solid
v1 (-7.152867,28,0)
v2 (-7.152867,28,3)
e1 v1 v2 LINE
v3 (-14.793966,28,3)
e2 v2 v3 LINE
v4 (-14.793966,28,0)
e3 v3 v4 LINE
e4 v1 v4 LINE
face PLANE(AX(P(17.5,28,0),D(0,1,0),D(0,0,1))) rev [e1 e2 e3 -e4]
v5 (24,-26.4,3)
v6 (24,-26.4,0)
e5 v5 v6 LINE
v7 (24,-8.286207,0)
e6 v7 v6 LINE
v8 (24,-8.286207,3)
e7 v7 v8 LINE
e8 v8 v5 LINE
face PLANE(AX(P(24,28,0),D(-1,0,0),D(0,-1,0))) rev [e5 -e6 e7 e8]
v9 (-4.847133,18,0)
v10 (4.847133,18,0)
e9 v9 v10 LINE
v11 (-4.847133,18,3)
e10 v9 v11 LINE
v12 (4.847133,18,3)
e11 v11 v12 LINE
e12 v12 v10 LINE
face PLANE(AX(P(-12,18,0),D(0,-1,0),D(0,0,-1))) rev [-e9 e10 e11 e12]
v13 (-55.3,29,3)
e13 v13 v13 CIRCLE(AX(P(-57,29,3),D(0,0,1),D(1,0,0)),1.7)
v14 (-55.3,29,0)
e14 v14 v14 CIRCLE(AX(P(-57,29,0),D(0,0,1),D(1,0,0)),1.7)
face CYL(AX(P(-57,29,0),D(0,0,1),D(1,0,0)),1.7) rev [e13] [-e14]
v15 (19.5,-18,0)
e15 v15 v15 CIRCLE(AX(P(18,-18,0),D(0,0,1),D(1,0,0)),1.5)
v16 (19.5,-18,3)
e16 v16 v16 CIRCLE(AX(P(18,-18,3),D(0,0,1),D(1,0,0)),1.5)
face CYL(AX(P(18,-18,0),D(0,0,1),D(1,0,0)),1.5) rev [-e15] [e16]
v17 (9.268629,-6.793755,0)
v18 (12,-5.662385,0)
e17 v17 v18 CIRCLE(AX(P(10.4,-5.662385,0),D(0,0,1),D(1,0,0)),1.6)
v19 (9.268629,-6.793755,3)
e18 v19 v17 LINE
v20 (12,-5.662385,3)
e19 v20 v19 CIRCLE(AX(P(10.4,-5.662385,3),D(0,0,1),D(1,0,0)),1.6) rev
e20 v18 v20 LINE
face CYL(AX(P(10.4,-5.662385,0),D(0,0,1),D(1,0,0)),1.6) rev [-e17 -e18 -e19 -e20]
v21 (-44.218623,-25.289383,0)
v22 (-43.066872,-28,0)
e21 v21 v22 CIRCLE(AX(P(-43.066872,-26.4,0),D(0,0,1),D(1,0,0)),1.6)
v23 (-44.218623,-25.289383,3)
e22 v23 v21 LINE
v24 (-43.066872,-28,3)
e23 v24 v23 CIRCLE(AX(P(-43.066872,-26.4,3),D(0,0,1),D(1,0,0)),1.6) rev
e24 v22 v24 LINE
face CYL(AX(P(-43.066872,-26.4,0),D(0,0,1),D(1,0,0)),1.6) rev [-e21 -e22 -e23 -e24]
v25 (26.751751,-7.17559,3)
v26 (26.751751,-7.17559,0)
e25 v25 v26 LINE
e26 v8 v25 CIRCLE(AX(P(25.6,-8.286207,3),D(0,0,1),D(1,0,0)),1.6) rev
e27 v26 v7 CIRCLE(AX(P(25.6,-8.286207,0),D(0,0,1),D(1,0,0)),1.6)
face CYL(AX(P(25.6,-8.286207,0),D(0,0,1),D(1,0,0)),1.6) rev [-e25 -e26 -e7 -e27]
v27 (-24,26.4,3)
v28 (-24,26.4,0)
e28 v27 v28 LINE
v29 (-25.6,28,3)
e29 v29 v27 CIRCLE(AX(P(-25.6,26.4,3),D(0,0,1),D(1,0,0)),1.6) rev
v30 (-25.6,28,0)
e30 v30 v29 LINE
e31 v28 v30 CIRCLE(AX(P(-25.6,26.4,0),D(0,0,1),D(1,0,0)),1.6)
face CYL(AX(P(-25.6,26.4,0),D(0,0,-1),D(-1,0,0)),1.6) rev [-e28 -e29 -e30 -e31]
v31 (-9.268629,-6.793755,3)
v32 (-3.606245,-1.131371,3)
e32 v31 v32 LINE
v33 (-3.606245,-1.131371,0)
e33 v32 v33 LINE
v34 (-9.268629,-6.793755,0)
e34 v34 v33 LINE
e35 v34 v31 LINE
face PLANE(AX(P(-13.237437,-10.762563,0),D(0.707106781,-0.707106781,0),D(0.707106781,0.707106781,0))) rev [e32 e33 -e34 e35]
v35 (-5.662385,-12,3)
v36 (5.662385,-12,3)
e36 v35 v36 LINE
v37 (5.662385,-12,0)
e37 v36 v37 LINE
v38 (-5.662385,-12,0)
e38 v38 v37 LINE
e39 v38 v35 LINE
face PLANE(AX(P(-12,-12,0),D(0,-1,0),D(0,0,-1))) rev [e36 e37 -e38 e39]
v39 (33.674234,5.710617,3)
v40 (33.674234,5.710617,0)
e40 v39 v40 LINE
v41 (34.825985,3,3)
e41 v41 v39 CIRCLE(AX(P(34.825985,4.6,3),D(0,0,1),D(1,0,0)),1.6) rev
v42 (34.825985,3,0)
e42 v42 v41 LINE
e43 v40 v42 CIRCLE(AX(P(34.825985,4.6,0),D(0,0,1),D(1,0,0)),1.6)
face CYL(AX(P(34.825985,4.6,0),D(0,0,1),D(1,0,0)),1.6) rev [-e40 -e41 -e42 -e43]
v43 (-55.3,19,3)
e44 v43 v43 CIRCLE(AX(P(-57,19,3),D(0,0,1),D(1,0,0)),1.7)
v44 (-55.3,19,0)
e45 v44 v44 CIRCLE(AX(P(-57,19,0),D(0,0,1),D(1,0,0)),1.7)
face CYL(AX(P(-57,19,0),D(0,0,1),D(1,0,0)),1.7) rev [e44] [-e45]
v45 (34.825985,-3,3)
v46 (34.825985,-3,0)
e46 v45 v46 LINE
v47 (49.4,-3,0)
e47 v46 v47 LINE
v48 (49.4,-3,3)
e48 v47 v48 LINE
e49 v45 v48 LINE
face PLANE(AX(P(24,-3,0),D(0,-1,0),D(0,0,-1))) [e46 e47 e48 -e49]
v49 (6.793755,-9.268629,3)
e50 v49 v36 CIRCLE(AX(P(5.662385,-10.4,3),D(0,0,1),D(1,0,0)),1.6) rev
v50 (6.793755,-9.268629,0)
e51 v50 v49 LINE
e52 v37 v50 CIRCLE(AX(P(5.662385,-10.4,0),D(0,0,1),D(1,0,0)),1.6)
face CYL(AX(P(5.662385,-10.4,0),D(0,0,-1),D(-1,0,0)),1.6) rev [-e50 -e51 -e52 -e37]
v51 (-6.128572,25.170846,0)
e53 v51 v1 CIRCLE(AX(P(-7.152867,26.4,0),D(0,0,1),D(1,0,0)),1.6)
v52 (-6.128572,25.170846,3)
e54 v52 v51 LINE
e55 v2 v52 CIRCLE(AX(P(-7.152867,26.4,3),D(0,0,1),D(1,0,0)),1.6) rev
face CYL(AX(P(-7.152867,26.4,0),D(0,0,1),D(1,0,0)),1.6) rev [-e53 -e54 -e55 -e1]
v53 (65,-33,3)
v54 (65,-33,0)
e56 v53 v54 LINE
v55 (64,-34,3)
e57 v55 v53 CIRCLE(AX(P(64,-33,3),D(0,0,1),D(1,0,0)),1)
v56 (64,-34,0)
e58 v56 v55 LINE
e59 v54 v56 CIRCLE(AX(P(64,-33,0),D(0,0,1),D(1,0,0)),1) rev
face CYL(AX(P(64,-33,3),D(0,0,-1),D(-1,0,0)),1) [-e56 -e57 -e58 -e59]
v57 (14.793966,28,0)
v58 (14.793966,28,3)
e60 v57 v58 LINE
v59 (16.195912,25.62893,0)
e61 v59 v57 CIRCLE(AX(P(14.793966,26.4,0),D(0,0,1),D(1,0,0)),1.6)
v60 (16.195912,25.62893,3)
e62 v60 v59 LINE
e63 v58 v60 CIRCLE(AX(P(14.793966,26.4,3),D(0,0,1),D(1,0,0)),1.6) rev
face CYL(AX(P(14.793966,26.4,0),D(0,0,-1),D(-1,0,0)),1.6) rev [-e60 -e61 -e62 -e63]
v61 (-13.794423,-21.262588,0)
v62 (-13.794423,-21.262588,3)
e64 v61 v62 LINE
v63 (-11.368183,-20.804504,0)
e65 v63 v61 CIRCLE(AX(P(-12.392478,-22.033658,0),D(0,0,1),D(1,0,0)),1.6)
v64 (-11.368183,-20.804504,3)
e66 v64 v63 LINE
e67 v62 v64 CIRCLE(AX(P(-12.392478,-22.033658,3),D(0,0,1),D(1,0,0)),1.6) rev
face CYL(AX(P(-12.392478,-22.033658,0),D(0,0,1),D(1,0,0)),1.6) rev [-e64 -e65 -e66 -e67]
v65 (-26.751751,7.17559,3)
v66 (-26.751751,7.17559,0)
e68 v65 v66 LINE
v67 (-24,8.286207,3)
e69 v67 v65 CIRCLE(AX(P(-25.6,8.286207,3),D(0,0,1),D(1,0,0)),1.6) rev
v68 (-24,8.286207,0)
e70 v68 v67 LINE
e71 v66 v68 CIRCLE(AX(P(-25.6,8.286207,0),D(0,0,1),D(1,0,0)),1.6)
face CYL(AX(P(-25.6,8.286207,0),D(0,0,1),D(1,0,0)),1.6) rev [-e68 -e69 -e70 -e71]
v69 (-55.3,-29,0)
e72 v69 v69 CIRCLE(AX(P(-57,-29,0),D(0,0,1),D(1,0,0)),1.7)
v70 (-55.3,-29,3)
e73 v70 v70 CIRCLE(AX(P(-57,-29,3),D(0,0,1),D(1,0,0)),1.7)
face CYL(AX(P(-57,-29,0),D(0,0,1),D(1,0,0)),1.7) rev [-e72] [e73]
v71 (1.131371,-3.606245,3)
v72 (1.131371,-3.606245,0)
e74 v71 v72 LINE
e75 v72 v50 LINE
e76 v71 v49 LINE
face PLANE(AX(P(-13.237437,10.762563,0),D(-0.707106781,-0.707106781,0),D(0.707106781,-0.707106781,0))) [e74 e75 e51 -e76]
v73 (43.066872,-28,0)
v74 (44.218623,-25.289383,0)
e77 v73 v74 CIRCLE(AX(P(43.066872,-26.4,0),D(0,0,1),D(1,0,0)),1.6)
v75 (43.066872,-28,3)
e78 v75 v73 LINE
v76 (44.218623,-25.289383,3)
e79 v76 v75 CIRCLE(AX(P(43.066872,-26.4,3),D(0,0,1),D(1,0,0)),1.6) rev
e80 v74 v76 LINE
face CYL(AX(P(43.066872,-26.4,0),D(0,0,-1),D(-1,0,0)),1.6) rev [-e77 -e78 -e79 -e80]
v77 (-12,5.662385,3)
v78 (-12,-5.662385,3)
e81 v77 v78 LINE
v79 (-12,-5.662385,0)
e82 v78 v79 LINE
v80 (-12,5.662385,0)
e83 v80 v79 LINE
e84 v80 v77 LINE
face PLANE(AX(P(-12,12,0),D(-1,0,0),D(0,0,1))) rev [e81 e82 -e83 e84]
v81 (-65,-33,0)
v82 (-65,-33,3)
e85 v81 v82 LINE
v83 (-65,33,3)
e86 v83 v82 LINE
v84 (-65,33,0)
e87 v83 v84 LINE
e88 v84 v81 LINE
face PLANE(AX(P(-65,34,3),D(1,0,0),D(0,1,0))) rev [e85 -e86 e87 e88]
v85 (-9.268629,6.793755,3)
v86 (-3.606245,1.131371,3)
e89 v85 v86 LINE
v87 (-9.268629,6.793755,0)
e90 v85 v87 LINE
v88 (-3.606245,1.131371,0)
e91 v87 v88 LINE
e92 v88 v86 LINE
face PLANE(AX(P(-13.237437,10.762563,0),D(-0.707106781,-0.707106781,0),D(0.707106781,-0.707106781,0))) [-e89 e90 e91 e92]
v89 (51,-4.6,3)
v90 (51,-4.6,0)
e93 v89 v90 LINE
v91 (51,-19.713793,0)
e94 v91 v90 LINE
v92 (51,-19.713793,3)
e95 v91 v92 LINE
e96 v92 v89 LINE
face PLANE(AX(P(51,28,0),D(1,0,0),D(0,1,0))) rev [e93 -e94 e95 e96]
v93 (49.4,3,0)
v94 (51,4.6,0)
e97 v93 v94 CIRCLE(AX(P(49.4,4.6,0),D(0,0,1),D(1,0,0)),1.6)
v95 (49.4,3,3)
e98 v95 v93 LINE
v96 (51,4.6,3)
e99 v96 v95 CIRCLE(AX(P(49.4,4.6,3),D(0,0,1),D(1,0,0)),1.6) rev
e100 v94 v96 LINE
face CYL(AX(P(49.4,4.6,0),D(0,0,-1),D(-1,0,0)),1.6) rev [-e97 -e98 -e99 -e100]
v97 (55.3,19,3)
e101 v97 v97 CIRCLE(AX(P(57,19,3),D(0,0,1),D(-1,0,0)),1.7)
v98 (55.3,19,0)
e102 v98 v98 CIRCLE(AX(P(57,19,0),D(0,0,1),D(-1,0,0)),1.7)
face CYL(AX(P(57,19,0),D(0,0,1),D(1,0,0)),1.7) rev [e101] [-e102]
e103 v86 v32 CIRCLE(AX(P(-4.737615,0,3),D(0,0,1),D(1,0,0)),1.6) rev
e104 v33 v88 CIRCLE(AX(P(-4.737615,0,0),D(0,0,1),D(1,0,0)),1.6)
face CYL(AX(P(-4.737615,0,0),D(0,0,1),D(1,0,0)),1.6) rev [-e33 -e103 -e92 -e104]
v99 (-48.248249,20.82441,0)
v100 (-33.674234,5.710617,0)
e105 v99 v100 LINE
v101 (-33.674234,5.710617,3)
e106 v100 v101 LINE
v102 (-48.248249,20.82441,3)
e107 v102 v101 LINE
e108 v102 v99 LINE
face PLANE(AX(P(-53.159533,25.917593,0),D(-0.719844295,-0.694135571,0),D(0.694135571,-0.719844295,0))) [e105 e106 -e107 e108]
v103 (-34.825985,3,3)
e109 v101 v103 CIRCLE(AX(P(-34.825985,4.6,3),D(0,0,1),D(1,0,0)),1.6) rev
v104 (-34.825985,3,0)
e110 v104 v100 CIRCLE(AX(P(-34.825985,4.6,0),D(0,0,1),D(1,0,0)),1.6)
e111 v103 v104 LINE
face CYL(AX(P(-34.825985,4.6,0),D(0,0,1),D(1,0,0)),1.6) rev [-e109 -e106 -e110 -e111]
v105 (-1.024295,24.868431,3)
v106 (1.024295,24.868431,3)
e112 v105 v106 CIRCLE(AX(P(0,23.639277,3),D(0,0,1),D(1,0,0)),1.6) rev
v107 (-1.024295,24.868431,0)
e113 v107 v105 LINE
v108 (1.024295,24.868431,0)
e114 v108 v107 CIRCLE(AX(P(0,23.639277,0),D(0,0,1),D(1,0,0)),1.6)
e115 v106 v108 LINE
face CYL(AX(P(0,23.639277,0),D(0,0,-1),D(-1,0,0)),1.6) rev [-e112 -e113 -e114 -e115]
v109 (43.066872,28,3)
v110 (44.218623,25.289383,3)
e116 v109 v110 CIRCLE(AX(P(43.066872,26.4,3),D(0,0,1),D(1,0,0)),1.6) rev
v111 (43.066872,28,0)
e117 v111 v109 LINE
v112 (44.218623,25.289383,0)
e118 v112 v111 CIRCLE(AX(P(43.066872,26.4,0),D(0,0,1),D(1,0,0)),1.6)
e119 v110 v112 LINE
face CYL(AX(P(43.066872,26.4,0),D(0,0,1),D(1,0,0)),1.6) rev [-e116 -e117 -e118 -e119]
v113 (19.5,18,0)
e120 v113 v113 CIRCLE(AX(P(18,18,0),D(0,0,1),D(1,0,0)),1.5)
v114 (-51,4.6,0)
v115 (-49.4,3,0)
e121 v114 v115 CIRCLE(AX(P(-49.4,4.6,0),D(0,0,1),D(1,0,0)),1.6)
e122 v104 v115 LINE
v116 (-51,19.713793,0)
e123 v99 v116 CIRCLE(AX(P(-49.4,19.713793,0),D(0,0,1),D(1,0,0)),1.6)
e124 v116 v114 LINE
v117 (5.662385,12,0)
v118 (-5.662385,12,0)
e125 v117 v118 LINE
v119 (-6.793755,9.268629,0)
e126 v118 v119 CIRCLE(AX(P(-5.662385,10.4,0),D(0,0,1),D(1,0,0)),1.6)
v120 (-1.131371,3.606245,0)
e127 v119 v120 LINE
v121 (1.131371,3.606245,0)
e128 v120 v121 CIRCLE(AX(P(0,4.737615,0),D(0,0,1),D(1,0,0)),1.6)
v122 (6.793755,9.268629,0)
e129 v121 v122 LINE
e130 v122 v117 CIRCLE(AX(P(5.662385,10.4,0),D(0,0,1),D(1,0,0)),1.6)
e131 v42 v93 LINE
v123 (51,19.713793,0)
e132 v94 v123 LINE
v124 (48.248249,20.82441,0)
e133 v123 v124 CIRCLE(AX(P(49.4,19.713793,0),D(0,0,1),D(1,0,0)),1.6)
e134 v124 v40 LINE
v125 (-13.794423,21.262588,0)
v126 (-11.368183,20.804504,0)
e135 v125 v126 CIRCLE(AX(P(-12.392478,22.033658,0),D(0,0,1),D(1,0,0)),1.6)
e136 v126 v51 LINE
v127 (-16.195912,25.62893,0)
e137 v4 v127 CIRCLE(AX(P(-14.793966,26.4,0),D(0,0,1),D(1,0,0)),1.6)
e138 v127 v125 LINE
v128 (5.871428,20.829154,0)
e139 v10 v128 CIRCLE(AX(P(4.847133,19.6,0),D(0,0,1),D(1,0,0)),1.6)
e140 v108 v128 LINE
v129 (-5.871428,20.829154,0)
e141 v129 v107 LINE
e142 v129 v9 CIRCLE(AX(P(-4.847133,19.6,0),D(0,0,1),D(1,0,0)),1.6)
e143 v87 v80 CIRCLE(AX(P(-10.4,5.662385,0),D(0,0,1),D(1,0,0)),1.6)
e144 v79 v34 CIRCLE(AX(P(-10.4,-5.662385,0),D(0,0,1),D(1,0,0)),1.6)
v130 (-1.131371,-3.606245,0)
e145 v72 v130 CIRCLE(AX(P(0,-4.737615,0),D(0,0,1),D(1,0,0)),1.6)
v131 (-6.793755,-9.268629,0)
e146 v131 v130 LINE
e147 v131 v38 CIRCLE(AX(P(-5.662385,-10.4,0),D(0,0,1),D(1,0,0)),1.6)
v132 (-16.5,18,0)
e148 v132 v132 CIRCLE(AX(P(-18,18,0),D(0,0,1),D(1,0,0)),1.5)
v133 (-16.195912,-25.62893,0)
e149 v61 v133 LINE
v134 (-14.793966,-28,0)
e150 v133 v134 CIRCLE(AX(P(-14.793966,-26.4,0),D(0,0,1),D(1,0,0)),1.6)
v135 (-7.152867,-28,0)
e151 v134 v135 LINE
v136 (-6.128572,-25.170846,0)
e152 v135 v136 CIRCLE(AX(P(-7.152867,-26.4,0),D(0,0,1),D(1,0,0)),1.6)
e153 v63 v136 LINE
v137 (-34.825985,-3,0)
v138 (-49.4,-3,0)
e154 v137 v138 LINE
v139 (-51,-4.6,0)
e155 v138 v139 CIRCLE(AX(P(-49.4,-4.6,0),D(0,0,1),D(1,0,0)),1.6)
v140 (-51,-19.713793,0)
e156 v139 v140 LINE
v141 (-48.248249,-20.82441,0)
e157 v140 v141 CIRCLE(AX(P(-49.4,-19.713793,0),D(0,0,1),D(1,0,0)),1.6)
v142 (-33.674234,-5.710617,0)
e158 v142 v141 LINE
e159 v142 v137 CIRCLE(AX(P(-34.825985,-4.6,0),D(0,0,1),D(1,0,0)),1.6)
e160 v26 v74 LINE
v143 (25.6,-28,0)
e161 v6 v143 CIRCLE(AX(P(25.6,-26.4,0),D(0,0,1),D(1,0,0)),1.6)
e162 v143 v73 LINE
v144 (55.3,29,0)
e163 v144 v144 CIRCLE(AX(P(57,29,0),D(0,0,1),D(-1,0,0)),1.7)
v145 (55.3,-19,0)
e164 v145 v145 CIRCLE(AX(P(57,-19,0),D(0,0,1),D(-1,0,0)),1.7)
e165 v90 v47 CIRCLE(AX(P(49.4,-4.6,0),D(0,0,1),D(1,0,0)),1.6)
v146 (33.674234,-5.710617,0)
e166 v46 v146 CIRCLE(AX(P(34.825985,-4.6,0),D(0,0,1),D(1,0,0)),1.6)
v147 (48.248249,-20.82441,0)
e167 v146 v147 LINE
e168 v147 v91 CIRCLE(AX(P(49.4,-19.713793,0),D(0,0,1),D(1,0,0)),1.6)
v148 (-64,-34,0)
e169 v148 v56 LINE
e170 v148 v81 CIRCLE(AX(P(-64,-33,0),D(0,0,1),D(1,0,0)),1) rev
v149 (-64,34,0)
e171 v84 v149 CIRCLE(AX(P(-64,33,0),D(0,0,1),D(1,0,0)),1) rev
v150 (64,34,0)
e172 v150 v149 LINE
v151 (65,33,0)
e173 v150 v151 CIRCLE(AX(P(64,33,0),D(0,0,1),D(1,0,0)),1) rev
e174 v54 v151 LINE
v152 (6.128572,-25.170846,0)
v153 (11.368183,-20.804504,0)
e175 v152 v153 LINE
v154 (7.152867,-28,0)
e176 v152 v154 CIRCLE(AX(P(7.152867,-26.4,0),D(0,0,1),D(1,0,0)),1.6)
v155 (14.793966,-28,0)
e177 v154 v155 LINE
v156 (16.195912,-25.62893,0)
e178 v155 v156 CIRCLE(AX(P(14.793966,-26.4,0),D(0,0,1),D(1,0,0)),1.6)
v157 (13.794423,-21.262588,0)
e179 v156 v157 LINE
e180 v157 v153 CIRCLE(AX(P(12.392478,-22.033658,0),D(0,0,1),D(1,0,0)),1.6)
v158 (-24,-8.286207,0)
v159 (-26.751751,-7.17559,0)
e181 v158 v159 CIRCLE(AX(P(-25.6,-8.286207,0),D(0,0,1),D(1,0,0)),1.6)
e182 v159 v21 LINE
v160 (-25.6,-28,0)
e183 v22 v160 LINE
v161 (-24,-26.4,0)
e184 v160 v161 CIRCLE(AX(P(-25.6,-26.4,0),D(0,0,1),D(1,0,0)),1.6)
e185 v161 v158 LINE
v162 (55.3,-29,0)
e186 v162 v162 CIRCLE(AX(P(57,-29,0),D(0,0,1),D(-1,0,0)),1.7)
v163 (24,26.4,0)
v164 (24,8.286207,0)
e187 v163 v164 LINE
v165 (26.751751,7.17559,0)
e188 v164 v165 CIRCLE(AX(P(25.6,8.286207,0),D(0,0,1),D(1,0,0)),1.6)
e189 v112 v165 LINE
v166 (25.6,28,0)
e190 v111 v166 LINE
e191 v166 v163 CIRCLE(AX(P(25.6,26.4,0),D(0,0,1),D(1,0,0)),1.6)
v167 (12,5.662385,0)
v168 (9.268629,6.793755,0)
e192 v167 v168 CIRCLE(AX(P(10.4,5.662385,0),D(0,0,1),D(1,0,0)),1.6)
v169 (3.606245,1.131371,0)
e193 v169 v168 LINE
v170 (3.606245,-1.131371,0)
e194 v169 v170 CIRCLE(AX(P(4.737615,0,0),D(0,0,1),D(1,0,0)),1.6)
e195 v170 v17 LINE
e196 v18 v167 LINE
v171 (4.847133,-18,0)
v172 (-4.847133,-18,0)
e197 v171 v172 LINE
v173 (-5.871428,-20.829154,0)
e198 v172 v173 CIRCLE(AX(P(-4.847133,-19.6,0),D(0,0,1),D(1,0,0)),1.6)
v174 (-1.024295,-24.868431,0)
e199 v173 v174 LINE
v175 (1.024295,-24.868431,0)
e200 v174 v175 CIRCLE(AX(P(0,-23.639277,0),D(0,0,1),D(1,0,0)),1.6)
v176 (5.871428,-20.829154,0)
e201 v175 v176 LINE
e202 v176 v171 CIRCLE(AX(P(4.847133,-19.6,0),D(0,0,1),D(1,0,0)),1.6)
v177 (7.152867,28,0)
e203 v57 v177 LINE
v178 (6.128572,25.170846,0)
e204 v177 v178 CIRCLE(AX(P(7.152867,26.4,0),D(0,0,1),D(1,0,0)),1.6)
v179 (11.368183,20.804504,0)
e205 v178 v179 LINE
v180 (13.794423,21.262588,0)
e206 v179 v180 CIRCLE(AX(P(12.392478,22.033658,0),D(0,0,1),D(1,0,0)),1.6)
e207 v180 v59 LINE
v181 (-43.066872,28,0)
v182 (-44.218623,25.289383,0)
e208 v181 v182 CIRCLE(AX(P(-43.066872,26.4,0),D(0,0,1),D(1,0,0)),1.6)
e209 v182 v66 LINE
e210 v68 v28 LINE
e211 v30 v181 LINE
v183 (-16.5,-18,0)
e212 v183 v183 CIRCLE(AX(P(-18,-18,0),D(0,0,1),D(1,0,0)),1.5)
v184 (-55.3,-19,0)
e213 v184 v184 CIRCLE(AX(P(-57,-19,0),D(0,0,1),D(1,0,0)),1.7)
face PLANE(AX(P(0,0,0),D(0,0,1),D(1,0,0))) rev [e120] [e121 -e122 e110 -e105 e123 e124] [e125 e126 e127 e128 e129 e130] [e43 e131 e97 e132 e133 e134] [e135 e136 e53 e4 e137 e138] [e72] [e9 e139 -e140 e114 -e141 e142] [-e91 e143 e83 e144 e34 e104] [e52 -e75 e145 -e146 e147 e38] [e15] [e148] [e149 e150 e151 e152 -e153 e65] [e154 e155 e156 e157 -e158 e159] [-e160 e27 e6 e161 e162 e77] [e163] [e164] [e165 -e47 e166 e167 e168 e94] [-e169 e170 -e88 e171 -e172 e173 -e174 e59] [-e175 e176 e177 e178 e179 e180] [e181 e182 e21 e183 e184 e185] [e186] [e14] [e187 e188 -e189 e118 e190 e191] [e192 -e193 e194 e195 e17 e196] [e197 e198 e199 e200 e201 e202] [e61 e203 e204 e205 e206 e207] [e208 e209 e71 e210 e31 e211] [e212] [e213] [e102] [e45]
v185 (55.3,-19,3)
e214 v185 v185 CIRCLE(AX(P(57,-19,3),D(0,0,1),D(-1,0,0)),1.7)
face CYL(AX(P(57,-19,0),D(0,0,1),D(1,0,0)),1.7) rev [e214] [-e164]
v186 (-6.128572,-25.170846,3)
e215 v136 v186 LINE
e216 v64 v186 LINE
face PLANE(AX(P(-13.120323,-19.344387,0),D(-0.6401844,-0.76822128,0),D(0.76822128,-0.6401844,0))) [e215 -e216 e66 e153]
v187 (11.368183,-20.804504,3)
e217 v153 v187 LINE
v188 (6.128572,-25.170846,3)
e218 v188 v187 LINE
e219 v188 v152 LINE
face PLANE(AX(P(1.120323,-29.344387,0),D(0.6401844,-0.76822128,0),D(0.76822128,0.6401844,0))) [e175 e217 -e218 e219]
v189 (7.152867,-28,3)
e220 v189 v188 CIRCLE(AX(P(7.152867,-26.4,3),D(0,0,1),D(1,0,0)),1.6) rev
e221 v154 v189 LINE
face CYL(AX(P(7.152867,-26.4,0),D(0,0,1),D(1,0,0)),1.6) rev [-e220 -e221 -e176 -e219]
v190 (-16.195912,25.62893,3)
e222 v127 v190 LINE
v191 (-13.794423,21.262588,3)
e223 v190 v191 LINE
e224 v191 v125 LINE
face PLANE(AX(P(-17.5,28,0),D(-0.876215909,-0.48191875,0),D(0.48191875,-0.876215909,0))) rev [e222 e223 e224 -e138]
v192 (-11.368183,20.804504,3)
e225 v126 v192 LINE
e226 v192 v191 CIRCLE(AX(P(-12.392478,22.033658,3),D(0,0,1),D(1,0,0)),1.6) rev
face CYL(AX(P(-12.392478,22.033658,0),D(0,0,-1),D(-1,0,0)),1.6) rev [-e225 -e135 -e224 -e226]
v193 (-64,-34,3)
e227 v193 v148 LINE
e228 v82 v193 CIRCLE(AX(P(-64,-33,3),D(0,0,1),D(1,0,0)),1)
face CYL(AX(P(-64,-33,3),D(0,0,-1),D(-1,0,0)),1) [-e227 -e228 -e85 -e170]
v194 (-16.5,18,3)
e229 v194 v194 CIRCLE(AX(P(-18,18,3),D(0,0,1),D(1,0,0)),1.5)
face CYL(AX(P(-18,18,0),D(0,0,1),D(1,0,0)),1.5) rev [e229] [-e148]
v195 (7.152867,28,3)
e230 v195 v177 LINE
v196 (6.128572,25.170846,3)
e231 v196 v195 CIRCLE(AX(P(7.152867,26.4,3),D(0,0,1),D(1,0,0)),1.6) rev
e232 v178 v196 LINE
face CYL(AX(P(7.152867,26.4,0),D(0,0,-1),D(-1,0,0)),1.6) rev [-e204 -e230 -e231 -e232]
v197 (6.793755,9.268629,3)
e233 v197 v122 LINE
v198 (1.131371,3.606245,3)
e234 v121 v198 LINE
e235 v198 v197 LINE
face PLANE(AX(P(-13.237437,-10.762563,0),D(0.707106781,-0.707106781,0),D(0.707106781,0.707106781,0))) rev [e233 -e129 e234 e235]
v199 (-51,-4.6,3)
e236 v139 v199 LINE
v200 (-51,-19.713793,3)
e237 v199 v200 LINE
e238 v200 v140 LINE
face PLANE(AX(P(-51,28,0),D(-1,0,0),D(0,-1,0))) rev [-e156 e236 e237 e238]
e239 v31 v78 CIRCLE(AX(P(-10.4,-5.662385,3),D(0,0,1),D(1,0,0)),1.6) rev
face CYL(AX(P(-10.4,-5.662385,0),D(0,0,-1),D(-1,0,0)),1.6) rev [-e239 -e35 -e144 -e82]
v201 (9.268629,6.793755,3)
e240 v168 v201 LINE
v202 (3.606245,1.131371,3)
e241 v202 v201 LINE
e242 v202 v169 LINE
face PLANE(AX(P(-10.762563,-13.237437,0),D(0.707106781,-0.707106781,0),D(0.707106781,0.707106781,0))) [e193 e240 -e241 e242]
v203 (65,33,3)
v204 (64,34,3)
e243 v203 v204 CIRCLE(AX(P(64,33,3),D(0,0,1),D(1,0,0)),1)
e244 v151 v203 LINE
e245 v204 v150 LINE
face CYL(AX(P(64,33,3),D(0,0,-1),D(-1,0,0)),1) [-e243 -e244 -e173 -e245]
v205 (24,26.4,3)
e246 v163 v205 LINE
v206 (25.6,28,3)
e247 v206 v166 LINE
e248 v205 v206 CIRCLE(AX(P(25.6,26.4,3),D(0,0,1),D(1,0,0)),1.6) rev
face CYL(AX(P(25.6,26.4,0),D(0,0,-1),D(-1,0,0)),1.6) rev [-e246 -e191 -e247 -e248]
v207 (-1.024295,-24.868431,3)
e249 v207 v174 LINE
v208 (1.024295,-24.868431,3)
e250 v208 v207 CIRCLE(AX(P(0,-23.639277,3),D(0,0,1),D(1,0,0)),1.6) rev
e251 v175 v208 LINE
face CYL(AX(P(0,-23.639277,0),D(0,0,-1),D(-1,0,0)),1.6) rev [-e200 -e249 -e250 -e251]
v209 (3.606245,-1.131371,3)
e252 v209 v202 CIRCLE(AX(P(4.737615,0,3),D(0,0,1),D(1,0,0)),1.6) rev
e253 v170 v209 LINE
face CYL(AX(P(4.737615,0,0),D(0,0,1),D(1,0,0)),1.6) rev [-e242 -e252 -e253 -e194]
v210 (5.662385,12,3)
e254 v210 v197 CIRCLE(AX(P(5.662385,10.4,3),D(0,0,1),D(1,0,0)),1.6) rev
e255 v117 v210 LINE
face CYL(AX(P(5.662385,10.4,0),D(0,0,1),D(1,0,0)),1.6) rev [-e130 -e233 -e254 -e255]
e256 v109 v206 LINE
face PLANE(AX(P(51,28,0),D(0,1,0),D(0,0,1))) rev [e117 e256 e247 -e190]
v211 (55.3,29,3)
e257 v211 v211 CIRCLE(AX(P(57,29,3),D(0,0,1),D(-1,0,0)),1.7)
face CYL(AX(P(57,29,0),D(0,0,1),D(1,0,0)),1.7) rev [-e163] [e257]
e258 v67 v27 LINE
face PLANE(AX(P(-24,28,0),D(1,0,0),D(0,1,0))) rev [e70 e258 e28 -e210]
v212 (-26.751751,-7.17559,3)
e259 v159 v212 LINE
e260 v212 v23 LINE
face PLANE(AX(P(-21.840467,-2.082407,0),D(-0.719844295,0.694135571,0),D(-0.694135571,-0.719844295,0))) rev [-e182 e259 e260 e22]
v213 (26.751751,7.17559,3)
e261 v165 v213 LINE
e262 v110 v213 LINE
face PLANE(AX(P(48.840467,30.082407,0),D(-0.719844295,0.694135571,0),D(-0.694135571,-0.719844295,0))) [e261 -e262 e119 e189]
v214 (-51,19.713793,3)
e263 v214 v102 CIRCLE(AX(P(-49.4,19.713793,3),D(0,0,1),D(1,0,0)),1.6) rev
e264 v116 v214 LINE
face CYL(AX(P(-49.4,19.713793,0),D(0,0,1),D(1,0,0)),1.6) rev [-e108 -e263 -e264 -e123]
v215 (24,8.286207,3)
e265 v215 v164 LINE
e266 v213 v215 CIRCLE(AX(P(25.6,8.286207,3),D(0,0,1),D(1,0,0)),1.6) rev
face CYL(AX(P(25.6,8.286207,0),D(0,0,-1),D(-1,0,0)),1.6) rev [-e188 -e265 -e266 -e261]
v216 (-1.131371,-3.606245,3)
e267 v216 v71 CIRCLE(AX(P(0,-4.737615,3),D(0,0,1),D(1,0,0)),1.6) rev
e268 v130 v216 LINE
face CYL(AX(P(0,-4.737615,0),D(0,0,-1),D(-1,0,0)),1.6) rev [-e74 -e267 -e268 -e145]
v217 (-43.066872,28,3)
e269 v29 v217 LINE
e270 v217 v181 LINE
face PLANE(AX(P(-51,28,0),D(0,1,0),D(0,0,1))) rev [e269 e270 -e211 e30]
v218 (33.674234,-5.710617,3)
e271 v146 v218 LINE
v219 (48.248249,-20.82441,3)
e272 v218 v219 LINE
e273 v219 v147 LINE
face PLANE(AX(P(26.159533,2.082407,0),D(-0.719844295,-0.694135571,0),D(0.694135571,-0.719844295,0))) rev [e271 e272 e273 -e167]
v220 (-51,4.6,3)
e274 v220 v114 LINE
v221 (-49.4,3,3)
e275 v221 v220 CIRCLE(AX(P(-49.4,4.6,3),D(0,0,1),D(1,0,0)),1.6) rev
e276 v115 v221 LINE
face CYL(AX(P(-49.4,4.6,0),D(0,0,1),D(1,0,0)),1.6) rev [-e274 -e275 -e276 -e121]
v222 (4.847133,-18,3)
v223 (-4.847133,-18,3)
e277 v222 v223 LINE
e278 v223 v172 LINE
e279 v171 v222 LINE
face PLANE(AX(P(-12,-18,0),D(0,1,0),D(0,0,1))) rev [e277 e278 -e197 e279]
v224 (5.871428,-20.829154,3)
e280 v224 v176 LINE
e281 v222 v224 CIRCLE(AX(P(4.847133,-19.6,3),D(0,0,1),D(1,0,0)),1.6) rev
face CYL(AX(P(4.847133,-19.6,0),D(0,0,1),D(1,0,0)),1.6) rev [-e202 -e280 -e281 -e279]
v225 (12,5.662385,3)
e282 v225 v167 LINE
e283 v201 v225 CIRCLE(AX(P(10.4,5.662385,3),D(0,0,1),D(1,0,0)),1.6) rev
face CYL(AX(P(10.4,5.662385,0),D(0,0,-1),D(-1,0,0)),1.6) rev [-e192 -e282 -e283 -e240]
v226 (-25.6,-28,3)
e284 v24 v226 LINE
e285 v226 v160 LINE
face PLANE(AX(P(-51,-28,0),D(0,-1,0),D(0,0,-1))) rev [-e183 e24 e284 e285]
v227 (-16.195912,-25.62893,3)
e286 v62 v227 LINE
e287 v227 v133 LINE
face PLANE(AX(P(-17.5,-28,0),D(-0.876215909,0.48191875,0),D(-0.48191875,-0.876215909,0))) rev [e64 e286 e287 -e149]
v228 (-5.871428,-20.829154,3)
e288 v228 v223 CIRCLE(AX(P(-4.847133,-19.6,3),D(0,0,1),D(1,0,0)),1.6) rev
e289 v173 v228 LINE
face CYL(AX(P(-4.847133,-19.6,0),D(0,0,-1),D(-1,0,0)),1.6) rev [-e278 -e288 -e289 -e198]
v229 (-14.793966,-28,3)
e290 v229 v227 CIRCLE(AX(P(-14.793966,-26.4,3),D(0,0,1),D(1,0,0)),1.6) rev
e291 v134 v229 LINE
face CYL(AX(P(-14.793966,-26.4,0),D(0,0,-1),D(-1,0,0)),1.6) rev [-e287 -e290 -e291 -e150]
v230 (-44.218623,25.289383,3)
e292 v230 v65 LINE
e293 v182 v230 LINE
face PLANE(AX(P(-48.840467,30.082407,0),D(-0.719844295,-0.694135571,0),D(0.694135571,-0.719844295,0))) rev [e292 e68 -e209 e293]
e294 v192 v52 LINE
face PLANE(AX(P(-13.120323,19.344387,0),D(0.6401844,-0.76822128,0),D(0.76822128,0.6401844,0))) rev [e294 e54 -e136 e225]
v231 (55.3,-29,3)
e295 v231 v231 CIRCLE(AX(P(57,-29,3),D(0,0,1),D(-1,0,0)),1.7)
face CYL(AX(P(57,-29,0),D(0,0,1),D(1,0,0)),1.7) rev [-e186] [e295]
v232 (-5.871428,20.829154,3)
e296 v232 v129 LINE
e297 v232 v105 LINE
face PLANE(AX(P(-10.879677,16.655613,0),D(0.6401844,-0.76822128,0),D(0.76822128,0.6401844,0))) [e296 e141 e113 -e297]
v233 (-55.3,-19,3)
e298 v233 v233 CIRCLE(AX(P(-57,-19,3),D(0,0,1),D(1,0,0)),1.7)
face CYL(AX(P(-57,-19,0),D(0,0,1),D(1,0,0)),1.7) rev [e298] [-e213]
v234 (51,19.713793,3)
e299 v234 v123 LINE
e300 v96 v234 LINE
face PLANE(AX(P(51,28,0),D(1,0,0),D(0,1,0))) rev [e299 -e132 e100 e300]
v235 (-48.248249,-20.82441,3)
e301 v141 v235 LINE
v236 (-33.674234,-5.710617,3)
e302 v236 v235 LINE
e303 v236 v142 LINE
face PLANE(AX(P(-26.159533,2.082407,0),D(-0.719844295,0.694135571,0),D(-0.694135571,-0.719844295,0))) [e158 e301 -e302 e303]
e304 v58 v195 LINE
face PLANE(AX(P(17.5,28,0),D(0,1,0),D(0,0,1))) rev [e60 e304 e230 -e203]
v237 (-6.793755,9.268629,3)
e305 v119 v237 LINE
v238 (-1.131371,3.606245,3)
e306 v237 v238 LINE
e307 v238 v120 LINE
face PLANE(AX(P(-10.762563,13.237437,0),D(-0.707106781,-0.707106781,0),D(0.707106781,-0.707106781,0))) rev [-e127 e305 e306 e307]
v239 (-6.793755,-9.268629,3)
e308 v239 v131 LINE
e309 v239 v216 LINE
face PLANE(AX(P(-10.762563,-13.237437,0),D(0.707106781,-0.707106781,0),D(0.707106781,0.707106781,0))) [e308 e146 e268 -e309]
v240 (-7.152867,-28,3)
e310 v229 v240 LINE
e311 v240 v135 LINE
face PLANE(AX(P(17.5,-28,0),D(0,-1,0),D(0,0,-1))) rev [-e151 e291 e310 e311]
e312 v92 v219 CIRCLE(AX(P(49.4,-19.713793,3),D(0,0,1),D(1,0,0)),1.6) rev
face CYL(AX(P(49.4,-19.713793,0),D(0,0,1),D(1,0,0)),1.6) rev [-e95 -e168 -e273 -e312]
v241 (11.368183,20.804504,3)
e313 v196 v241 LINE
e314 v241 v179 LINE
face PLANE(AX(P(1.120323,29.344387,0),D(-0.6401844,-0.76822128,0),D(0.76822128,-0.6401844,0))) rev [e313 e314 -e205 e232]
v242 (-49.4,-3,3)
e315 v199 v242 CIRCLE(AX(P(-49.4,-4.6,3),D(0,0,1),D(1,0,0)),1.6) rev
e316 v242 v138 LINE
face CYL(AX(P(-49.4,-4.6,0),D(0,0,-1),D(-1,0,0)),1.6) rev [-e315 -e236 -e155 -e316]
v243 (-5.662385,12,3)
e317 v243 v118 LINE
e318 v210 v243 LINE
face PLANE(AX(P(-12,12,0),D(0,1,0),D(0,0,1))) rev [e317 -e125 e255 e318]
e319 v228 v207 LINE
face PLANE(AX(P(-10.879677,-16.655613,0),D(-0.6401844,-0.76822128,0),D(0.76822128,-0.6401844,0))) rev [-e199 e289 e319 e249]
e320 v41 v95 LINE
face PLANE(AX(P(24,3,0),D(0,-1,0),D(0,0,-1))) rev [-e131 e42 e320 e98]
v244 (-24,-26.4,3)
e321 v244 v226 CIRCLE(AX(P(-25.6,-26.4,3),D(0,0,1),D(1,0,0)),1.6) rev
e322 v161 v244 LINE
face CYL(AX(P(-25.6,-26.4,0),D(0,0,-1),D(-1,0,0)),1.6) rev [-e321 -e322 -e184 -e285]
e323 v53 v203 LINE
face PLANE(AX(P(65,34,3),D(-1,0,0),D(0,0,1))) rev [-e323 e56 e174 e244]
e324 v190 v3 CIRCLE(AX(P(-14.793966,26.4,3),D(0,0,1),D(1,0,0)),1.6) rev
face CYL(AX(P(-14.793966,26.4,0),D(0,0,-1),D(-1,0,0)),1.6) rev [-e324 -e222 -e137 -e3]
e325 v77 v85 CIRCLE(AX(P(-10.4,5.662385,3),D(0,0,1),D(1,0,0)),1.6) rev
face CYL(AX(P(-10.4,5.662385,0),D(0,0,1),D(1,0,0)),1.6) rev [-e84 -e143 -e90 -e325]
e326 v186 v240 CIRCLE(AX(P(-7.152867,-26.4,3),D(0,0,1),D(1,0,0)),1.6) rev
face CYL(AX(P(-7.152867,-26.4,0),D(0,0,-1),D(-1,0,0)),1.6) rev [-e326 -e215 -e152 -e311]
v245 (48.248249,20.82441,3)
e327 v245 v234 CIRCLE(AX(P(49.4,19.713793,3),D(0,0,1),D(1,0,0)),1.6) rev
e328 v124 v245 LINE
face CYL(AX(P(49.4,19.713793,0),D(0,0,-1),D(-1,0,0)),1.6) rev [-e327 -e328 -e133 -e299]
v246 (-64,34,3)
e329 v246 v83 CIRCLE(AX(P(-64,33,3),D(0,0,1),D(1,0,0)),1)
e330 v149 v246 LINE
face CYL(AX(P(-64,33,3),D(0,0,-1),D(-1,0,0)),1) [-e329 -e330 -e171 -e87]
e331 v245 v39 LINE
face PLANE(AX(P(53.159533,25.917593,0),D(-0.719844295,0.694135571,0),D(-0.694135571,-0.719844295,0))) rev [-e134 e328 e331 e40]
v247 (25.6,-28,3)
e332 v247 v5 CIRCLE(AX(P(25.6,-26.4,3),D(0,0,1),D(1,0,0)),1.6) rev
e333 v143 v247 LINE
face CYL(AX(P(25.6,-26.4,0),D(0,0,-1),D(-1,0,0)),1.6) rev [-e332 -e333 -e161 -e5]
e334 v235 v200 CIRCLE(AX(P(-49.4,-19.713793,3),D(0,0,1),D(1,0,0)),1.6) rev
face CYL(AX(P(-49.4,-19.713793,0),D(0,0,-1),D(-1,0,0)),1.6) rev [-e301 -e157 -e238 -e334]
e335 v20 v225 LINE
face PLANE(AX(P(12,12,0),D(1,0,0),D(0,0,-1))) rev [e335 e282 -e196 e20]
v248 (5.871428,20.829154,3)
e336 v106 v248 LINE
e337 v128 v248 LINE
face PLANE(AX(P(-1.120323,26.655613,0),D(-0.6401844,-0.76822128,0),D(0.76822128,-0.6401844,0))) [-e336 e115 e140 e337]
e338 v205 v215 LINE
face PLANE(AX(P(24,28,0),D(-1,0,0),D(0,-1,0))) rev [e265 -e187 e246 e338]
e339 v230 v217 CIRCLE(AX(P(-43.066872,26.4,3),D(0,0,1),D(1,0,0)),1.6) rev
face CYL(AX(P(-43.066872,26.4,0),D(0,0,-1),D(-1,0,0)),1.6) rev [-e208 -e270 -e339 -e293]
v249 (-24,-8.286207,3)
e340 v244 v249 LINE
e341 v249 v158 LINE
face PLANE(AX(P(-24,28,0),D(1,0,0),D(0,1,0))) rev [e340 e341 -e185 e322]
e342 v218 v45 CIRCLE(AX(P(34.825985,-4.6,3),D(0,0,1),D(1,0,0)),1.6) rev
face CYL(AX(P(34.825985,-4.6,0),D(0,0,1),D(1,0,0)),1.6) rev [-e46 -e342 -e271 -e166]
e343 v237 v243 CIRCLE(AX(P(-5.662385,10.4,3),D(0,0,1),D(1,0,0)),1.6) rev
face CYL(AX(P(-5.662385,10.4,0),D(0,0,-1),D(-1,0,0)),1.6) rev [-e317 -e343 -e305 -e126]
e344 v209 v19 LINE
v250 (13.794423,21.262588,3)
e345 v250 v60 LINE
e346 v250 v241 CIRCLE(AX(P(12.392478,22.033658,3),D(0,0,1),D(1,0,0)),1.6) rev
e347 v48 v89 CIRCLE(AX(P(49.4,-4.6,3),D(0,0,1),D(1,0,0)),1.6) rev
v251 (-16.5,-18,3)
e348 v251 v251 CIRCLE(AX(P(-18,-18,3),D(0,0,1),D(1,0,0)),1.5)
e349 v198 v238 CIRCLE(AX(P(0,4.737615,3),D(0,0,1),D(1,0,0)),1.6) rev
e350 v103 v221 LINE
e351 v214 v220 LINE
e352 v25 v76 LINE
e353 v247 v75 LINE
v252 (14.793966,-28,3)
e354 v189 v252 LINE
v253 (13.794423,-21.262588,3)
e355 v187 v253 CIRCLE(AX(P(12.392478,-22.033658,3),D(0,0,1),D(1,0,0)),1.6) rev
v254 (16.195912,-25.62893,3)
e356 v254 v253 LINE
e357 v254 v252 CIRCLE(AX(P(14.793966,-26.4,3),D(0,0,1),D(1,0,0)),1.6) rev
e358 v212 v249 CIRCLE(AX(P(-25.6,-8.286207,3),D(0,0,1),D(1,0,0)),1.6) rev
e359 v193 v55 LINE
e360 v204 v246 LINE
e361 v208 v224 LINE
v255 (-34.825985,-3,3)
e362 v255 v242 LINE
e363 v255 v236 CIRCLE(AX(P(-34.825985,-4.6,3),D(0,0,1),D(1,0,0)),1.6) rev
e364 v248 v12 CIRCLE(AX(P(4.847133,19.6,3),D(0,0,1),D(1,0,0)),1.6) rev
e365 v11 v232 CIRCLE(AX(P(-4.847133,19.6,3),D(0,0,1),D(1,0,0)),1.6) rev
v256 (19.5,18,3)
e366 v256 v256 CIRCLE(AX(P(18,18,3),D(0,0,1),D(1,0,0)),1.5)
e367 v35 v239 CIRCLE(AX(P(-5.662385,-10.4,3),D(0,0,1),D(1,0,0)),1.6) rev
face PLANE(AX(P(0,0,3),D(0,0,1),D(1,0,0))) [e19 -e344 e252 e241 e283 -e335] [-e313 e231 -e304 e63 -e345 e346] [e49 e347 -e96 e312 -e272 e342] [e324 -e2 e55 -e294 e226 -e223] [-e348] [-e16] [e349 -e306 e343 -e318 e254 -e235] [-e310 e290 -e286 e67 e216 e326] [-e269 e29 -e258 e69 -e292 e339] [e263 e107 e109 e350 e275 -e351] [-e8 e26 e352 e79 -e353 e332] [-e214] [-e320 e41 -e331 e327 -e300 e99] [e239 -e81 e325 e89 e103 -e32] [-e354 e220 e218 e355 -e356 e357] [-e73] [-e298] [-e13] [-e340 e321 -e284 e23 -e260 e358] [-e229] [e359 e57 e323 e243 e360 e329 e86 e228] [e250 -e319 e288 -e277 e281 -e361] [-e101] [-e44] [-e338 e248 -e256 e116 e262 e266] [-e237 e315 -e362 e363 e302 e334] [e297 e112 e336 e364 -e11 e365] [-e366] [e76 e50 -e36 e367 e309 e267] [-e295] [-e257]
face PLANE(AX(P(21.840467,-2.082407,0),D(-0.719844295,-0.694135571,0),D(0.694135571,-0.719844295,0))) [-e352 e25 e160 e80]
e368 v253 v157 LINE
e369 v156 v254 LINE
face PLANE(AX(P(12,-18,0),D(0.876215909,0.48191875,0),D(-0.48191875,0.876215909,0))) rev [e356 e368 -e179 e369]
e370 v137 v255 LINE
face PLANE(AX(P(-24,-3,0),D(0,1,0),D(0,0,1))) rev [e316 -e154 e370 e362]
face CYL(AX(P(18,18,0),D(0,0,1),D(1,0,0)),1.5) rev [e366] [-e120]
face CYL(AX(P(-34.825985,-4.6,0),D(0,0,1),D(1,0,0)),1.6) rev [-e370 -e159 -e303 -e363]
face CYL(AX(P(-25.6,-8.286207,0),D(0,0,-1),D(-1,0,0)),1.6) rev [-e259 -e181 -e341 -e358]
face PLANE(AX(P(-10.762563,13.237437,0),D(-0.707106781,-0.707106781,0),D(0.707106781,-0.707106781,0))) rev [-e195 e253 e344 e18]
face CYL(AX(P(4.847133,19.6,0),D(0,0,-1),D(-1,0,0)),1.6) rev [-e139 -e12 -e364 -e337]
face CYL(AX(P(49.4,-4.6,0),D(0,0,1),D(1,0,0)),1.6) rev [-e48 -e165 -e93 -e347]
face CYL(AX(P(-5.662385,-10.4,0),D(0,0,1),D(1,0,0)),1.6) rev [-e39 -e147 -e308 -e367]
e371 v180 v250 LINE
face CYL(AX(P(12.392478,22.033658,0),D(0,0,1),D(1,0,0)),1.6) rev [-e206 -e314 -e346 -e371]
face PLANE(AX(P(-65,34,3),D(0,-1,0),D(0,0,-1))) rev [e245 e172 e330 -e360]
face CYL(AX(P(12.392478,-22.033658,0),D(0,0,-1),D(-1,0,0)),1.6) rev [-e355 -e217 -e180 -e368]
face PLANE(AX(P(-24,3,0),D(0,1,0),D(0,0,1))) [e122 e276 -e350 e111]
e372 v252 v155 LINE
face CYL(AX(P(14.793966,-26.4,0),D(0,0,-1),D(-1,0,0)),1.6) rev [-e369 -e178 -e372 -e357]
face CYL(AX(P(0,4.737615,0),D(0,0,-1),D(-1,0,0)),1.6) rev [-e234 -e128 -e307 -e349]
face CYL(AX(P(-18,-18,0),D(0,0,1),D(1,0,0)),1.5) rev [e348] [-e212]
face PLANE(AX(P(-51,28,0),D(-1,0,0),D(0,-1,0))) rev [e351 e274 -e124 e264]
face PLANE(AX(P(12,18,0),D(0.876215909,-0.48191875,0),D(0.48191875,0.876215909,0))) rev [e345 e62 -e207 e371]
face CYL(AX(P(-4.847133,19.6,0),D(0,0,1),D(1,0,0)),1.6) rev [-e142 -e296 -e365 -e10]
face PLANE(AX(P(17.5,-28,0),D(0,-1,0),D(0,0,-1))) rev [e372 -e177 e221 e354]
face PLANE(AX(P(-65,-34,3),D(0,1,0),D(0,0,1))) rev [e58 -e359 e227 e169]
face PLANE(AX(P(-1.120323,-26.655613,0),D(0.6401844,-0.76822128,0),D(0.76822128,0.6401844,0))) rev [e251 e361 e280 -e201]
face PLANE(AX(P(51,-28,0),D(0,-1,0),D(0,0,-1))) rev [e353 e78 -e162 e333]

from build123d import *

# Parameters (mm, degrees)
SKETCH_1_W          = 130
SKETCH_1_H          = 68
EXTRUDE_1_DEPTH     = 3
SKETCH_2_R          = 1.7
CUT_EXTRUDE_1_DEPTH = 74.416619372
SKETCH_3_R          = 1.5
CUT_EXTRUDE_2_DEPTH = 74.416619372
SKETCH_4_W          = 27
SKETCH_4_H          = 56
SKETCH_4_W_2        = 24
SKETCH_4_H_2        = 24
CUT_EXTRUDE_3_DEPTH = 74.416619372
EXTRUDE_1_2_DEPTH   = 3
EXTRUDE_START       = -3
EXTRUDE_3_DEPTH     = 3
FILLET_2_R          = 1
FILLET_3_R          = 1.6


# Read off the part's stored shape, not the designer's step: 拉伸-薄壁3
with BuildPart() as part:
    # 草图1 → Extrude 1 (new body)
    with BuildSketch(Plane.XY):
        Rectangle(SKETCH_1_W, SKETCH_1_H)
    extrude(amount=EXTRUDE_1_DEPTH)

    # 草图2 → 切除-拉伸1 (cut, through all)
    with BuildSketch(Plane.XY.offset(3)):
        with Locations((-57, -29)):
            Circle(SKETCH_2_R)
        with Locations((-57, -19)):
            Circle(SKETCH_2_R)
        with Locations((-57, 19)):
            Circle(SKETCH_2_R)
        with Locations((-57, 29)):
            Circle(SKETCH_2_R)
        with Locations(Location((57, 29, 0), (0, 0, 180))):
            Circle(SKETCH_2_R)
        with Locations(Location((57, 19, 0), (0, 0, 180))):
            Circle(SKETCH_2_R)
        with Locations(Location((57, -19, 0), (0, 0, 180))):
            Circle(SKETCH_2_R)
        with Locations(Location((57, -29, 0), (0, 0, 180))):
            Circle(SKETCH_2_R)
    extrude(amount=-CUT_EXTRUDE_1_DEPTH, mode=Mode.SUBTRACT)

    # 草图3 → 切除-拉伸2 (cut, through all)
    with BuildSketch(Plane.XY.offset(3)):
        with Locations((-18, 18)):
            Circle(SKETCH_3_R)
        with Locations((18, 18)):
            Circle(SKETCH_3_R)
        with Locations((18, -18)):
            Circle(SKETCH_3_R)
        with Locations((-18, -18)):
            Circle(SKETCH_3_R)
    extrude(amount=-CUT_EXTRUDE_2_DEPTH, mode=Mode.SUBTRACT)

    # 草图4 → 切除-拉伸3 (cut, through all)
    with BuildSketch(Plane.XY.offset(3)):
        with Locations((-37.5, 0)):
            Rectangle(SKETCH_4_W, SKETCH_4_H)
        Rectangle(SKETCH_4_W_2, SKETCH_4_H_2)
        with Locations((37.5, 0)):
            Rectangle(SKETCH_4_W, SKETCH_4_H)
        Polygon((-17.5, 28), (-12, 18), (12, 18), (17.5, 28), align=None)
        Polygon((12, -18), (17.5, -28), (-17.5, -28), (-12, -18), align=None)
    extrude(amount=-CUT_EXTRUDE_3_DEPTH, mode=Mode.SUBTRACT)

    # 草图5 → Extrude 1 2 (add, through all)
    with BuildSketch(Plane.XY.offset(3)):
        Polygon((-13.237436867, 10.762563133), (10.762563133, -13.237436867), (13.237436867, -10.762563133), (-10.762563133, 13.237436867), align=None)
        Polygon((-10.762563133, -13.237436867), (13.237436867, 10.762563133), (10.762563133, 13.237436867), (-13.237436867, -10.762563133), align=None)
        Polygon((-10.879677301, 16.655612761), (0, 25.722010511), (10.879677301, 16.655612761), (13.120322699, 19.344387239), (0, 30.277989489), (-13.120322699, 19.344387239), align=None)
        Polygon((-13.120322699, -19.344387239), (0, -30.277989489), (13.120322699, -19.344387239), (10.879677301, -16.655612761), (0, -25.722010511), (-10.879677301, -16.655612761), align=None)
    extrude(amount=-EXTRUDE_1_2_DEPTH)

    # 拉伸-薄壁3 outline → 拉伸-薄壁3 (add)
    with BuildSketch(Plane.XY.offset(3).offset(EXTRUDE_START)):
        Polygon((51, -23.678077702), (31.060425073, -3), (51, -3), (51, 3), (31.060425073, 3), (51, 23.678077702), (51, 28), (46.83243207, 28), (24, 4.321922298), (24, -4.321922298), (46.83243207, -28), (51, -28), align=None)
        Polygon((-51, 23.678077702), (-31.060425073, 3), (-51, 3), (-51, -3), (-31.060425073, -3), (-51, -23.678077702), (-51, -28), (-46.83243207, -28), (-24, -4.321922298), (-24, 4.321922298), (-46.83243207, 28), (-51, 28), align=None)
    extrude(amount=EXTRUDE_3_DEPTH)

    # 圆角2
    fillet_2_edges = [part.edges().sort_by_distance(p)[0] for p in [
        (65, -34, 1.5),
        (-65, -34, 1.5),
        (-65, 34, 1.5),
        (65, 34, 1.5),
    ]]
    fillet(fillet_2_edges, radius=FILLET_2_R)

    # 圆角3
    fillet_3_edges = [part.edges().sort_by_distance(p)[0] for p in [
        (-24, 28, 1.5),
        (-24, -28, 1.5),
        (17.5, -28, 1.5),
        (-17.5, -28, 1.5),
        (-17.5, 28, 1.5),
        (17.5, 28, 1.5),
        (24, -28, 1.5),
        (24, 28, 1.5),
        (9.525126266, 12, 1.5),
        (-9.525126266, 12, 1.5),
        (-12, -9.525126266, 1.5),
        (-12, 9.525126266, 1.5),
        (-9.525126266, -12, 1.5),
        (9.525126266, -12, 1.5),
        (12, 9.525126266, 1.5),
        (12, -9.525126266, 1.5),
        (2.474873734, 0, 1.5),
        (0, -2.474873734, 1.5),
        (-2.474873734, 0, 1.5),
        (0, 2.474873734, 1.5),
        (-12.859127464, 19.562049935, 1.5),
        (-9.266412613, 18, 1.5),
        (9.266412613, 18, 1.5),
        (12.859127464, 19.562049935, 1.5),
        (2.733587387, 28, 1.5),
        (0, 25.722010511, 1.5),
        (-2.733587387, 28, 1.5),
        (-12.859127464, -19.562049935, 1.5),
        (2.733587387, -28, 1.5),
        (9.266412613, -18, 1.5),
        (-9.266412613, -18, 1.5),
        (0, -25.722010511, 1.5),
        (12.859127464, -19.562049935, 1.5),
        (-2.733587387, -28, 1.5),
        (46.83243207, 28, 1.5),
        (24, -4.321922298, 1.5),
        (51, 23.678077702, 1.5),
        (51, -23.678077702, 1.5),
        (31.060425073, -3, 1.5),
        (31.060425073, 3, 1.5),
        (46.83243207, -28, 1.5),
        (24, 4.321922298, 1.5),
        (51, 3, 1.5),
        (51, -3, 1.5),
        (-46.83243207, -28, 1.5),
        (-24, 4.321922298, 1.5),
        (-51, -23.678077702, 1.5),
        (-51, 23.678077702, 1.5),
        (-46.83243207, 28, 1.5),
        (-24, -4.321922298, 1.5),
        (-31.060425073, -3, 1.5),
        (-51, -3, 1.5),
        (-31.060425073, 3, 1.5),
        (-51, 3, 1.5),
    ]]
    fillet(fillet_3_edges, radius=FILLET_3_R)


solid = part.part
